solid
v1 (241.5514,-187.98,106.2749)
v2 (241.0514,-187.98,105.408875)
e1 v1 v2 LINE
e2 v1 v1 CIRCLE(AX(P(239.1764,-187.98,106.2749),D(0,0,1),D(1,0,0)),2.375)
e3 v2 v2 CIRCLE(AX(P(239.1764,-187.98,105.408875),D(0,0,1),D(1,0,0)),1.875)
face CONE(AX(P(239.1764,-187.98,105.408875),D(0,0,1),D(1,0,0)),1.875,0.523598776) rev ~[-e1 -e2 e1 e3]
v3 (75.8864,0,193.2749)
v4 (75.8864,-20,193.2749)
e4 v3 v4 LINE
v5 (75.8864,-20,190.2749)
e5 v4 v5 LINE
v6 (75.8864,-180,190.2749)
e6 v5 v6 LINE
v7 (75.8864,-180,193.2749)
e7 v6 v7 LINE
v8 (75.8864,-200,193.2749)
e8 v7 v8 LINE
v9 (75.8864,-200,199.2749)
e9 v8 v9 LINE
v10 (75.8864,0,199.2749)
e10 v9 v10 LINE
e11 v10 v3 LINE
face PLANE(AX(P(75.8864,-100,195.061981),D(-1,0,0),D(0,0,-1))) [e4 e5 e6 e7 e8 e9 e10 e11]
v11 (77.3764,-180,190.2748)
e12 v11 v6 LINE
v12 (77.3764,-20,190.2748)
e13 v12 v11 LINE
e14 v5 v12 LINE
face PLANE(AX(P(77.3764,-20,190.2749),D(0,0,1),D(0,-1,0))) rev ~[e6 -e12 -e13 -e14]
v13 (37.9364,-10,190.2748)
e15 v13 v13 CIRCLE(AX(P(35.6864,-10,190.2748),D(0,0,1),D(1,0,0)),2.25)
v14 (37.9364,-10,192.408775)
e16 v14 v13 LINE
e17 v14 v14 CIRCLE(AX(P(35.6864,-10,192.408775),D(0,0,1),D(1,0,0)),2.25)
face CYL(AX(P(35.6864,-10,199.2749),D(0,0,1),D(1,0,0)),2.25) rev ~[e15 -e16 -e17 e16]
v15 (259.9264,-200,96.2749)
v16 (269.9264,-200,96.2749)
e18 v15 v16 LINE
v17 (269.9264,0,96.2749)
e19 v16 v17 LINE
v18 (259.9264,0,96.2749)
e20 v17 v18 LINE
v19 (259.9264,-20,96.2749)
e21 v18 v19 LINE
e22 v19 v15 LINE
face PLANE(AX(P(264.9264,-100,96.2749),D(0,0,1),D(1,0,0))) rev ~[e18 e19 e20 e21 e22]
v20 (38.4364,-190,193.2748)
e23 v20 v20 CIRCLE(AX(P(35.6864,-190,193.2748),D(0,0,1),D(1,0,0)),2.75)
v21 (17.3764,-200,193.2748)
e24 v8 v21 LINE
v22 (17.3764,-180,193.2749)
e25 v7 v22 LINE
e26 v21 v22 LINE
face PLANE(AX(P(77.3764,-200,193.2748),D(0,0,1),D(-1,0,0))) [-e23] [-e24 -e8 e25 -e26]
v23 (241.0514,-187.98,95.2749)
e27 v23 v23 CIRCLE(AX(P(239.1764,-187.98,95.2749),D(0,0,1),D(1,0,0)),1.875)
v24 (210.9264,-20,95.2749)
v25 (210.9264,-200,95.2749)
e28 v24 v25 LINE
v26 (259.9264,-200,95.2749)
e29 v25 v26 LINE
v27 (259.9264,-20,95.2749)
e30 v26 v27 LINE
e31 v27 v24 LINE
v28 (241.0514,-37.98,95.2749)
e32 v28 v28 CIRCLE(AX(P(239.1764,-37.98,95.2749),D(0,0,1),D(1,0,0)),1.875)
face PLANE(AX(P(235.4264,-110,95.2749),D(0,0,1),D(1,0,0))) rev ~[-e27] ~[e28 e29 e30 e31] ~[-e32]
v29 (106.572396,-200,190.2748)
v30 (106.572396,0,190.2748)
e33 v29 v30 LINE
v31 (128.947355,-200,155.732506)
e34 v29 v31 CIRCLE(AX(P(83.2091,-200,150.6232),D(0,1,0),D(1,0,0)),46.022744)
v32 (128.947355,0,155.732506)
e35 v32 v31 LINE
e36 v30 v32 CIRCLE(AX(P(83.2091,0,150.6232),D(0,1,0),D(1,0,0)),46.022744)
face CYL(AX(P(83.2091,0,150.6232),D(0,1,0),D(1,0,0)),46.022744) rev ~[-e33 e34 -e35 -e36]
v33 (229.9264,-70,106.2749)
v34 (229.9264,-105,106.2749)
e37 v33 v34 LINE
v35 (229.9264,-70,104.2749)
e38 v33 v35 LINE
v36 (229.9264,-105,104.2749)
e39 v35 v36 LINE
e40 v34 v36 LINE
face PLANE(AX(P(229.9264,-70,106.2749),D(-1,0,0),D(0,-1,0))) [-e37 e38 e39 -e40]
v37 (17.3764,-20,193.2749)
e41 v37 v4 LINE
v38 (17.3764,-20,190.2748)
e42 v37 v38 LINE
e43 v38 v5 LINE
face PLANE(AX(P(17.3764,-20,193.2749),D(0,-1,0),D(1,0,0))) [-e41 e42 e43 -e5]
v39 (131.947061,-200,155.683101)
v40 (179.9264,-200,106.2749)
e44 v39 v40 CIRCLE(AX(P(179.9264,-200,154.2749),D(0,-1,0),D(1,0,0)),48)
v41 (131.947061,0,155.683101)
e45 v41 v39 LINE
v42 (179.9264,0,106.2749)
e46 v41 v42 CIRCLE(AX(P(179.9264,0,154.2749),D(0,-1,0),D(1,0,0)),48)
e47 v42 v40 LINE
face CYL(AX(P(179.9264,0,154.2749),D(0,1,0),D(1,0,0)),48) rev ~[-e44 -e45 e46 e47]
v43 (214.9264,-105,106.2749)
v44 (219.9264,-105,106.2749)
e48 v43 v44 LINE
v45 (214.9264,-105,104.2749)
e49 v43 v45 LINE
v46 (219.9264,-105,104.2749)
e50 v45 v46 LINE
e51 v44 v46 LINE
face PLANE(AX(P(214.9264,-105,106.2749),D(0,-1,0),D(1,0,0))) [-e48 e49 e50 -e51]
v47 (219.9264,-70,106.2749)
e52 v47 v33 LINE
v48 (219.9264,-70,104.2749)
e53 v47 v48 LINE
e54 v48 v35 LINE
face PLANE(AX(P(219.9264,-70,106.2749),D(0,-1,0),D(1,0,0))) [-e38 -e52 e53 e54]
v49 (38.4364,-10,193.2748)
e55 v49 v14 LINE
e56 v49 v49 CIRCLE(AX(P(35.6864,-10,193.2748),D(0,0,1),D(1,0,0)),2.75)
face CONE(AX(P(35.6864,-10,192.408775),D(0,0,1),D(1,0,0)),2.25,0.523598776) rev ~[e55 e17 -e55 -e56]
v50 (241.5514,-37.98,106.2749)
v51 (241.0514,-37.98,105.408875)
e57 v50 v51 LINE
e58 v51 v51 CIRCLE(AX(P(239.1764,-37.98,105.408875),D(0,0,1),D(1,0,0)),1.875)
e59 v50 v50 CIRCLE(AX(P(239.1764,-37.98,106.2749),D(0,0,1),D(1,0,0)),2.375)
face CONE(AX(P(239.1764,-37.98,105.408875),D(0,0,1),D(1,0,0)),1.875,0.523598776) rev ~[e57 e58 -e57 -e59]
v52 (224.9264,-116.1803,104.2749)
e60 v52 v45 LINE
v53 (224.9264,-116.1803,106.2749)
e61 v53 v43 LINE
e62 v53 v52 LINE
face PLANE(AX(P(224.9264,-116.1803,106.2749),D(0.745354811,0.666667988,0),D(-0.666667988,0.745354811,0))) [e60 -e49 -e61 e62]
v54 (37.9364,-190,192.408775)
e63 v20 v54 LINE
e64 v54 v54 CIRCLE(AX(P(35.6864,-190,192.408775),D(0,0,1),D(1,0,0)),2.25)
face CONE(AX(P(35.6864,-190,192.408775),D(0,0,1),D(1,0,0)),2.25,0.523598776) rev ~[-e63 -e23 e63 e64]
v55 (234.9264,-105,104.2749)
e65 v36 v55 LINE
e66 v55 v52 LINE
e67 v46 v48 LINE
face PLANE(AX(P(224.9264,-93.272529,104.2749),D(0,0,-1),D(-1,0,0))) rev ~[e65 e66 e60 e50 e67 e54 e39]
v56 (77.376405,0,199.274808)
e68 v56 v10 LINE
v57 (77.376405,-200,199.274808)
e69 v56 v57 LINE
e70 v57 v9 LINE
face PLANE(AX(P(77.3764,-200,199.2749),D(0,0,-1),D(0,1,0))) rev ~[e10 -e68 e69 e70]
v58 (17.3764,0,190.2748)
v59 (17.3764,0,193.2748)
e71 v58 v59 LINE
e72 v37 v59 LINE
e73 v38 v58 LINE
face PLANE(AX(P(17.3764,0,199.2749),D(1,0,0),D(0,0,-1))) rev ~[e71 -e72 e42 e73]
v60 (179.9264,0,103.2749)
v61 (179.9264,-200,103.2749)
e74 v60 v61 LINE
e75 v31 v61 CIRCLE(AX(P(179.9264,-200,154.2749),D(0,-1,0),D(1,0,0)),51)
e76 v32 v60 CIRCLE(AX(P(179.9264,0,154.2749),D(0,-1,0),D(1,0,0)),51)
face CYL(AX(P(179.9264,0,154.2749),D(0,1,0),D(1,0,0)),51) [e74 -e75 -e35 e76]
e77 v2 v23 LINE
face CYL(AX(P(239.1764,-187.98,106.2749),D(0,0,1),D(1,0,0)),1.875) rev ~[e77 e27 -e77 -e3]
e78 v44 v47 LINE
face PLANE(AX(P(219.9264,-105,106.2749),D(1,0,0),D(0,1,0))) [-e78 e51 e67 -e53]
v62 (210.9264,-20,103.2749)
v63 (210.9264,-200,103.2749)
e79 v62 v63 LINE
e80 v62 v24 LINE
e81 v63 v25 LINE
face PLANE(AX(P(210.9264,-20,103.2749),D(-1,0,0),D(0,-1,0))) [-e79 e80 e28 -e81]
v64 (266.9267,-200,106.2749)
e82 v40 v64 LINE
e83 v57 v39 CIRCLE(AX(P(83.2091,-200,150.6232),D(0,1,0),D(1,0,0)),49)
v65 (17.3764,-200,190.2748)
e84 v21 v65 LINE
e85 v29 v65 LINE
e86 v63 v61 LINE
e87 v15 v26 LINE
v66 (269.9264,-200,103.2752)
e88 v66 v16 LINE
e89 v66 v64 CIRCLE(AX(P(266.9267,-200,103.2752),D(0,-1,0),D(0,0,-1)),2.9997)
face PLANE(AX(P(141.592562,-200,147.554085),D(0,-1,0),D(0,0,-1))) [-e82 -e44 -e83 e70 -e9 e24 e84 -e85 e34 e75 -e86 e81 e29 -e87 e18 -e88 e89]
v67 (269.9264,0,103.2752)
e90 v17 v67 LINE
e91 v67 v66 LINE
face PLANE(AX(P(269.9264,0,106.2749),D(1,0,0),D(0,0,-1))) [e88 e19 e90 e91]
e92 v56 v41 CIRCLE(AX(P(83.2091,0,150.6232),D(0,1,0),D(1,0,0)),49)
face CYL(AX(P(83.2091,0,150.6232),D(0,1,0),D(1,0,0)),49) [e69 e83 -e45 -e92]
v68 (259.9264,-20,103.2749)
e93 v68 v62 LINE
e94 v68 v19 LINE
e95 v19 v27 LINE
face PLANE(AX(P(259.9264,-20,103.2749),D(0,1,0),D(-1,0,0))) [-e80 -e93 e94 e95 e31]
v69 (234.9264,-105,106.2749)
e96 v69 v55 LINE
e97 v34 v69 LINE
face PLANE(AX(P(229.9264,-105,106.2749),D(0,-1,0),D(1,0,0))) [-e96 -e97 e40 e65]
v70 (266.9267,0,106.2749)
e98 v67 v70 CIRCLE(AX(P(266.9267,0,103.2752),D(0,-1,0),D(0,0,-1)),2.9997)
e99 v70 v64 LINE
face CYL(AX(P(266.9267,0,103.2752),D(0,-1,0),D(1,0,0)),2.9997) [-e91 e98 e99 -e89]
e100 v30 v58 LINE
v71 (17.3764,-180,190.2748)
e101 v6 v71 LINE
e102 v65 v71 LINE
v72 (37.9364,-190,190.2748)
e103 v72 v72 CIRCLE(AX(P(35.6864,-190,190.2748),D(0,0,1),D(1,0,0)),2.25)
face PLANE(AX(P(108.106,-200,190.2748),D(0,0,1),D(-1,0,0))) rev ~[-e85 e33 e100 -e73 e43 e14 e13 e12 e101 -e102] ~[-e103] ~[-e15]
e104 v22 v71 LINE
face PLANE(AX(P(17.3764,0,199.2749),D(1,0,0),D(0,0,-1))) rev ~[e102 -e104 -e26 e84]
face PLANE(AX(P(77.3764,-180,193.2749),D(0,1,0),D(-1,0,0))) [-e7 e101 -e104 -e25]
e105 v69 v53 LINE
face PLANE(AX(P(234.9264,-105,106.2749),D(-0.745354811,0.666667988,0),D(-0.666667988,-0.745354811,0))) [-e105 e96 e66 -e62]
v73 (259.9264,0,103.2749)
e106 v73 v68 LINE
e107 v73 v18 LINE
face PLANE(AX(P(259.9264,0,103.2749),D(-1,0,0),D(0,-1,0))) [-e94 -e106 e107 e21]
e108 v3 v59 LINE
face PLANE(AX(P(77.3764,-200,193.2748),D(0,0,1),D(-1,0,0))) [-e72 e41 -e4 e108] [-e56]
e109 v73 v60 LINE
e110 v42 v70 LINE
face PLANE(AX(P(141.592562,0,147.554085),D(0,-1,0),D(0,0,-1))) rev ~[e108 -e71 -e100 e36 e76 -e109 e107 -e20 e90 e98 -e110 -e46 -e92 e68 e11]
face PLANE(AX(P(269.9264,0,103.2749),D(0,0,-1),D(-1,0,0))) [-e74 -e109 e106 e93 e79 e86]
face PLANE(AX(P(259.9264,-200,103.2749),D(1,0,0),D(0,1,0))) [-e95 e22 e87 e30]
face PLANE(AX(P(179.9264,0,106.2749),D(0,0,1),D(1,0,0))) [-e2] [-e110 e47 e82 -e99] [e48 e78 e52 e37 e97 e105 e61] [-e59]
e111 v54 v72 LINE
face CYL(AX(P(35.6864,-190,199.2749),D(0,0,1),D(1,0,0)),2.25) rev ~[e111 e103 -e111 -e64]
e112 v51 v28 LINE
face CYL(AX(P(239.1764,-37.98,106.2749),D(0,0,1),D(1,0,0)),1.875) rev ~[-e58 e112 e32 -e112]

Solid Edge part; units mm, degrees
sketch "Sketch1" plane through (0, 0, 0) normal (0, -1, 0) x (1, 0, 0)
  line L0 (77.3764, 199.2749) -> (17.3764, 199.2749)
  line L1 (17.3764, 199.2749) -> (17.3764, 196.2749)
  line L2 (17.3764, 196.2749) -> (77.3764, 196.2749)
  arc A0 (77.3764, 196.2749) -> (128.9473, 155.7325) centre (83.2091, 150.6232) cw
  arc A1 (128.9473, 155.7325) -> (179.9264, 103.2749) centre (179.9264, 154.2749) ccw
  line L3 (269.9264, 103.2749) -> (179.9264, 103.2749)
  line L4 (269.9264, 106.2749) -> (269.9264, 103.2749)
  line L5 (179.9264, 106.2749) -> (269.9264, 106.2749)
  arc A2 (131.9471, 155.6831) -> (179.9264, 106.2749) centre (179.9264, 154.2749) ccw
  arc A3 (77.3764, 199.2749) -> (131.9471, 155.6831) centre (83.2091, 150.6232) cw
  dimension "D1" = 3
  dimension "D2" = 60
  dimension "D3" = 90
  dimension "D4" = 3
  dimension "D5" = 90
  dimension "D6" = 102.55
  dimension "D7" = 49
  dimension "D8" = 48
  dimension "D9" = 90
extrude "Protrusion1" add sketch "Sketch1" along normal blind 200
fillet "Verrundung_4" radius 3 1 edges at (269.9264, -100, 106.2749)
sketch "Sketch2" plane through (143.6514, -200, 152.9362) normal (0, -1, 0) x (1, 0, 0)
  line L0 (-126.275, 37.3386) -> (-126.275, 43.3386)
  line L1 (-126.275, 43.3386) -> (-126.275, 46.3386)
  line L2 (-126.275, 46.3386) -> (-66.275, 46.3386)
  line L3 (-66.275, 46.3386) -> (-50.0814, 44.2327)
  line L4 (-50.0814, 44.2327) -> (-37.0073, 38.973)
  line L5 (-37.0073, 38.973) -> (-35.5454, 37.3386)
  line L6 (-35.5454, 37.3386) -> (-126.275, 37.3386)
  dimension "D1" = 6
extrude "Protrusion2" add sketch "Sketch2" against normal up to vertex (200 mm away)
sketch "Sketch3" plane through (47.3764, -100, 199.2749) normal (0, 0, 1) x (1, 0, 0)
  circle A0 centre (-11.69, 90) radius 2.25
  circle A1 centre (-11.69, -90) radius 2.25
  dimension "D1" = 10
  dimension "D2" = 4.5
  dimension "D3" = 18.31
  dimension "D4" = 10
extrude "Cutout1" cut sketch "Sketch3" against normal through all
sketch "Sketch4" plane through (143.6514, -200, 151.449) normal (0, -1, 0) x (1, 0, 0)
  line L0 (-126.275, 47.8258) -> (-66.275, 47.8258)
  line L1 (-66.275, 47.8258) -> (-66.275, 41.8258)
  line L2 (-66.275, 41.8258) -> (-126.275, 41.8258)
  line L3 (-126.275, 41.8258) -> (-126.275, 47.8258)
extrude "Cutout2" cut sketch "Sketch4" against normal through all
sketch "Sketch5" plane through (224.9264, -100, 103.2749) normal (0, 0, -1) x (1, 0, 0)
  line L0 (-14, 100) -> (35, 100)
  line L1 (35, 100) -> (35, -80)
  line L2 (35, -80) -> (-14, -80)
  line L3 (-14, -80) -> (-14, 100)
  dimension "D1" = 20
  dimension "D2" = 49
  dimension "D3" = 10
extrude "Extrusionsausprägung_3" add sketch "Sketch5" along normal blind 8
sketch "Sketch6" plane through (47.3764, -100, 193.2749) normal (0, 0, 1) x (1, 0, 0)
  line L0 (-30, 80) -> (30, 80)
  line L1 (30, 80) -> (30, -80)
  line L2 (30, -80) -> (-30, -80)
  line L3 (-30, -80) -> (-30, 80)
  dimension "D1" = 160
extrude "Cutout3" cut sketch "Sketch6" against normal through all
sketch "Sketch7" plane through (223.4264, -100, 106.2749) normal (0, 0, 1) x (1, 0, 0)
  circle A0 centre (15.75, 62.02) radius 1.875
  circle A1 centre (15.75, -87.98) radius 1.875
  dimension "D1" = 30.75
  dimension "D2" = 150
  dimension "D3" = 37.98
  dimension "D4" = 3.75
extrude "Cutout4" cut sketch "Sketch7" against normal through all
sketch "Sketch8" plane through (224.9264, -100, 103.2749) normal (0, 0, -1) x (1, 0, 0)
  line L0 (35, 100) -> (45, 100)
  line L1 (45, 100) -> (45, -100)
  line L2 (45, -100) -> (35, -100)
  line L3 (35, -100) -> (35, 100)
extrude "Extrusionsausprägung_4" add sketch "Sketch8" along normal blind 7
sketch "Sketch9" plane through (77.3764, -100, 194.7749) normal (-1, 0, 0) x (0, -1, 0)
  line L0 (-100, 4.5) -> (-100, -1.5)
  line L1 (-100, -1.5) -> (-80, -1.5)
  line L2 (-80, -1.5) -> (-80, -4.5)
  line L3 (-80, -4.5) -> (80, -4.5)
  line L4 (80, -4.5) -> (80, -1.5)
  line L5 (80, -1.5) -> (100, -1.5)
  line L6 (100, -1.5) -> (100, 4.5)
  line L7 (100, 4.5) -> (-100, 4.5)
extrude "Extrusionsausprägung_5" add sketch "Sketch9" along normal blind 1.49
sketch "Sketch10" plane through (223.4264, -100, 106.2749) normal (0, 0, 1) x (1, 0, 0)
  line L0 (-3.5, 30) -> (6.5, 30)
  line L1 (6.5, 30) -> (6.5, -5)
  line L2 (6.5, -5) -> (11.5, -5)
  line L3 (11.5, -5) -> (1.5, -16.1803)
  line L4 (1.5, -16.1803) -> (-8.5, -5)
  line L5 (-8.5, -5) -> (-3.5, -5)
  line L6 (-3.5, -5) -> (-3.5, 30)
  dimension "D1" = 10
  dimension "D2" = 35
  dimension "D3" = 5
  dimension "D4" = 15
  dimension "D5" = 45
  dimension "D6" = 70
extrude "Extrusionsausschnitt_7" cut sketch "Sketch10" against normal blind 2
chamfer "Fase_1" distance 0.5 angle 60 4 edges at (33.4364, -10, 193.2749) (33.4364, -190, 193.2749) (237.3014, -37.98, 106.2749) (237.3014, -187.98, 106.2749) measured on face at (66.7198, -183.5333, 193.2748) measured on face at (66.7198, -3.5333, 193.2748) measured on face at (66.7198, -183.5333, 193.2748) measured on face at (66.7198, -3.5333, 193.2748) measured on face at (193.5564, -164.6667, 106.2749)
properties material "Nylon, allgemein"
